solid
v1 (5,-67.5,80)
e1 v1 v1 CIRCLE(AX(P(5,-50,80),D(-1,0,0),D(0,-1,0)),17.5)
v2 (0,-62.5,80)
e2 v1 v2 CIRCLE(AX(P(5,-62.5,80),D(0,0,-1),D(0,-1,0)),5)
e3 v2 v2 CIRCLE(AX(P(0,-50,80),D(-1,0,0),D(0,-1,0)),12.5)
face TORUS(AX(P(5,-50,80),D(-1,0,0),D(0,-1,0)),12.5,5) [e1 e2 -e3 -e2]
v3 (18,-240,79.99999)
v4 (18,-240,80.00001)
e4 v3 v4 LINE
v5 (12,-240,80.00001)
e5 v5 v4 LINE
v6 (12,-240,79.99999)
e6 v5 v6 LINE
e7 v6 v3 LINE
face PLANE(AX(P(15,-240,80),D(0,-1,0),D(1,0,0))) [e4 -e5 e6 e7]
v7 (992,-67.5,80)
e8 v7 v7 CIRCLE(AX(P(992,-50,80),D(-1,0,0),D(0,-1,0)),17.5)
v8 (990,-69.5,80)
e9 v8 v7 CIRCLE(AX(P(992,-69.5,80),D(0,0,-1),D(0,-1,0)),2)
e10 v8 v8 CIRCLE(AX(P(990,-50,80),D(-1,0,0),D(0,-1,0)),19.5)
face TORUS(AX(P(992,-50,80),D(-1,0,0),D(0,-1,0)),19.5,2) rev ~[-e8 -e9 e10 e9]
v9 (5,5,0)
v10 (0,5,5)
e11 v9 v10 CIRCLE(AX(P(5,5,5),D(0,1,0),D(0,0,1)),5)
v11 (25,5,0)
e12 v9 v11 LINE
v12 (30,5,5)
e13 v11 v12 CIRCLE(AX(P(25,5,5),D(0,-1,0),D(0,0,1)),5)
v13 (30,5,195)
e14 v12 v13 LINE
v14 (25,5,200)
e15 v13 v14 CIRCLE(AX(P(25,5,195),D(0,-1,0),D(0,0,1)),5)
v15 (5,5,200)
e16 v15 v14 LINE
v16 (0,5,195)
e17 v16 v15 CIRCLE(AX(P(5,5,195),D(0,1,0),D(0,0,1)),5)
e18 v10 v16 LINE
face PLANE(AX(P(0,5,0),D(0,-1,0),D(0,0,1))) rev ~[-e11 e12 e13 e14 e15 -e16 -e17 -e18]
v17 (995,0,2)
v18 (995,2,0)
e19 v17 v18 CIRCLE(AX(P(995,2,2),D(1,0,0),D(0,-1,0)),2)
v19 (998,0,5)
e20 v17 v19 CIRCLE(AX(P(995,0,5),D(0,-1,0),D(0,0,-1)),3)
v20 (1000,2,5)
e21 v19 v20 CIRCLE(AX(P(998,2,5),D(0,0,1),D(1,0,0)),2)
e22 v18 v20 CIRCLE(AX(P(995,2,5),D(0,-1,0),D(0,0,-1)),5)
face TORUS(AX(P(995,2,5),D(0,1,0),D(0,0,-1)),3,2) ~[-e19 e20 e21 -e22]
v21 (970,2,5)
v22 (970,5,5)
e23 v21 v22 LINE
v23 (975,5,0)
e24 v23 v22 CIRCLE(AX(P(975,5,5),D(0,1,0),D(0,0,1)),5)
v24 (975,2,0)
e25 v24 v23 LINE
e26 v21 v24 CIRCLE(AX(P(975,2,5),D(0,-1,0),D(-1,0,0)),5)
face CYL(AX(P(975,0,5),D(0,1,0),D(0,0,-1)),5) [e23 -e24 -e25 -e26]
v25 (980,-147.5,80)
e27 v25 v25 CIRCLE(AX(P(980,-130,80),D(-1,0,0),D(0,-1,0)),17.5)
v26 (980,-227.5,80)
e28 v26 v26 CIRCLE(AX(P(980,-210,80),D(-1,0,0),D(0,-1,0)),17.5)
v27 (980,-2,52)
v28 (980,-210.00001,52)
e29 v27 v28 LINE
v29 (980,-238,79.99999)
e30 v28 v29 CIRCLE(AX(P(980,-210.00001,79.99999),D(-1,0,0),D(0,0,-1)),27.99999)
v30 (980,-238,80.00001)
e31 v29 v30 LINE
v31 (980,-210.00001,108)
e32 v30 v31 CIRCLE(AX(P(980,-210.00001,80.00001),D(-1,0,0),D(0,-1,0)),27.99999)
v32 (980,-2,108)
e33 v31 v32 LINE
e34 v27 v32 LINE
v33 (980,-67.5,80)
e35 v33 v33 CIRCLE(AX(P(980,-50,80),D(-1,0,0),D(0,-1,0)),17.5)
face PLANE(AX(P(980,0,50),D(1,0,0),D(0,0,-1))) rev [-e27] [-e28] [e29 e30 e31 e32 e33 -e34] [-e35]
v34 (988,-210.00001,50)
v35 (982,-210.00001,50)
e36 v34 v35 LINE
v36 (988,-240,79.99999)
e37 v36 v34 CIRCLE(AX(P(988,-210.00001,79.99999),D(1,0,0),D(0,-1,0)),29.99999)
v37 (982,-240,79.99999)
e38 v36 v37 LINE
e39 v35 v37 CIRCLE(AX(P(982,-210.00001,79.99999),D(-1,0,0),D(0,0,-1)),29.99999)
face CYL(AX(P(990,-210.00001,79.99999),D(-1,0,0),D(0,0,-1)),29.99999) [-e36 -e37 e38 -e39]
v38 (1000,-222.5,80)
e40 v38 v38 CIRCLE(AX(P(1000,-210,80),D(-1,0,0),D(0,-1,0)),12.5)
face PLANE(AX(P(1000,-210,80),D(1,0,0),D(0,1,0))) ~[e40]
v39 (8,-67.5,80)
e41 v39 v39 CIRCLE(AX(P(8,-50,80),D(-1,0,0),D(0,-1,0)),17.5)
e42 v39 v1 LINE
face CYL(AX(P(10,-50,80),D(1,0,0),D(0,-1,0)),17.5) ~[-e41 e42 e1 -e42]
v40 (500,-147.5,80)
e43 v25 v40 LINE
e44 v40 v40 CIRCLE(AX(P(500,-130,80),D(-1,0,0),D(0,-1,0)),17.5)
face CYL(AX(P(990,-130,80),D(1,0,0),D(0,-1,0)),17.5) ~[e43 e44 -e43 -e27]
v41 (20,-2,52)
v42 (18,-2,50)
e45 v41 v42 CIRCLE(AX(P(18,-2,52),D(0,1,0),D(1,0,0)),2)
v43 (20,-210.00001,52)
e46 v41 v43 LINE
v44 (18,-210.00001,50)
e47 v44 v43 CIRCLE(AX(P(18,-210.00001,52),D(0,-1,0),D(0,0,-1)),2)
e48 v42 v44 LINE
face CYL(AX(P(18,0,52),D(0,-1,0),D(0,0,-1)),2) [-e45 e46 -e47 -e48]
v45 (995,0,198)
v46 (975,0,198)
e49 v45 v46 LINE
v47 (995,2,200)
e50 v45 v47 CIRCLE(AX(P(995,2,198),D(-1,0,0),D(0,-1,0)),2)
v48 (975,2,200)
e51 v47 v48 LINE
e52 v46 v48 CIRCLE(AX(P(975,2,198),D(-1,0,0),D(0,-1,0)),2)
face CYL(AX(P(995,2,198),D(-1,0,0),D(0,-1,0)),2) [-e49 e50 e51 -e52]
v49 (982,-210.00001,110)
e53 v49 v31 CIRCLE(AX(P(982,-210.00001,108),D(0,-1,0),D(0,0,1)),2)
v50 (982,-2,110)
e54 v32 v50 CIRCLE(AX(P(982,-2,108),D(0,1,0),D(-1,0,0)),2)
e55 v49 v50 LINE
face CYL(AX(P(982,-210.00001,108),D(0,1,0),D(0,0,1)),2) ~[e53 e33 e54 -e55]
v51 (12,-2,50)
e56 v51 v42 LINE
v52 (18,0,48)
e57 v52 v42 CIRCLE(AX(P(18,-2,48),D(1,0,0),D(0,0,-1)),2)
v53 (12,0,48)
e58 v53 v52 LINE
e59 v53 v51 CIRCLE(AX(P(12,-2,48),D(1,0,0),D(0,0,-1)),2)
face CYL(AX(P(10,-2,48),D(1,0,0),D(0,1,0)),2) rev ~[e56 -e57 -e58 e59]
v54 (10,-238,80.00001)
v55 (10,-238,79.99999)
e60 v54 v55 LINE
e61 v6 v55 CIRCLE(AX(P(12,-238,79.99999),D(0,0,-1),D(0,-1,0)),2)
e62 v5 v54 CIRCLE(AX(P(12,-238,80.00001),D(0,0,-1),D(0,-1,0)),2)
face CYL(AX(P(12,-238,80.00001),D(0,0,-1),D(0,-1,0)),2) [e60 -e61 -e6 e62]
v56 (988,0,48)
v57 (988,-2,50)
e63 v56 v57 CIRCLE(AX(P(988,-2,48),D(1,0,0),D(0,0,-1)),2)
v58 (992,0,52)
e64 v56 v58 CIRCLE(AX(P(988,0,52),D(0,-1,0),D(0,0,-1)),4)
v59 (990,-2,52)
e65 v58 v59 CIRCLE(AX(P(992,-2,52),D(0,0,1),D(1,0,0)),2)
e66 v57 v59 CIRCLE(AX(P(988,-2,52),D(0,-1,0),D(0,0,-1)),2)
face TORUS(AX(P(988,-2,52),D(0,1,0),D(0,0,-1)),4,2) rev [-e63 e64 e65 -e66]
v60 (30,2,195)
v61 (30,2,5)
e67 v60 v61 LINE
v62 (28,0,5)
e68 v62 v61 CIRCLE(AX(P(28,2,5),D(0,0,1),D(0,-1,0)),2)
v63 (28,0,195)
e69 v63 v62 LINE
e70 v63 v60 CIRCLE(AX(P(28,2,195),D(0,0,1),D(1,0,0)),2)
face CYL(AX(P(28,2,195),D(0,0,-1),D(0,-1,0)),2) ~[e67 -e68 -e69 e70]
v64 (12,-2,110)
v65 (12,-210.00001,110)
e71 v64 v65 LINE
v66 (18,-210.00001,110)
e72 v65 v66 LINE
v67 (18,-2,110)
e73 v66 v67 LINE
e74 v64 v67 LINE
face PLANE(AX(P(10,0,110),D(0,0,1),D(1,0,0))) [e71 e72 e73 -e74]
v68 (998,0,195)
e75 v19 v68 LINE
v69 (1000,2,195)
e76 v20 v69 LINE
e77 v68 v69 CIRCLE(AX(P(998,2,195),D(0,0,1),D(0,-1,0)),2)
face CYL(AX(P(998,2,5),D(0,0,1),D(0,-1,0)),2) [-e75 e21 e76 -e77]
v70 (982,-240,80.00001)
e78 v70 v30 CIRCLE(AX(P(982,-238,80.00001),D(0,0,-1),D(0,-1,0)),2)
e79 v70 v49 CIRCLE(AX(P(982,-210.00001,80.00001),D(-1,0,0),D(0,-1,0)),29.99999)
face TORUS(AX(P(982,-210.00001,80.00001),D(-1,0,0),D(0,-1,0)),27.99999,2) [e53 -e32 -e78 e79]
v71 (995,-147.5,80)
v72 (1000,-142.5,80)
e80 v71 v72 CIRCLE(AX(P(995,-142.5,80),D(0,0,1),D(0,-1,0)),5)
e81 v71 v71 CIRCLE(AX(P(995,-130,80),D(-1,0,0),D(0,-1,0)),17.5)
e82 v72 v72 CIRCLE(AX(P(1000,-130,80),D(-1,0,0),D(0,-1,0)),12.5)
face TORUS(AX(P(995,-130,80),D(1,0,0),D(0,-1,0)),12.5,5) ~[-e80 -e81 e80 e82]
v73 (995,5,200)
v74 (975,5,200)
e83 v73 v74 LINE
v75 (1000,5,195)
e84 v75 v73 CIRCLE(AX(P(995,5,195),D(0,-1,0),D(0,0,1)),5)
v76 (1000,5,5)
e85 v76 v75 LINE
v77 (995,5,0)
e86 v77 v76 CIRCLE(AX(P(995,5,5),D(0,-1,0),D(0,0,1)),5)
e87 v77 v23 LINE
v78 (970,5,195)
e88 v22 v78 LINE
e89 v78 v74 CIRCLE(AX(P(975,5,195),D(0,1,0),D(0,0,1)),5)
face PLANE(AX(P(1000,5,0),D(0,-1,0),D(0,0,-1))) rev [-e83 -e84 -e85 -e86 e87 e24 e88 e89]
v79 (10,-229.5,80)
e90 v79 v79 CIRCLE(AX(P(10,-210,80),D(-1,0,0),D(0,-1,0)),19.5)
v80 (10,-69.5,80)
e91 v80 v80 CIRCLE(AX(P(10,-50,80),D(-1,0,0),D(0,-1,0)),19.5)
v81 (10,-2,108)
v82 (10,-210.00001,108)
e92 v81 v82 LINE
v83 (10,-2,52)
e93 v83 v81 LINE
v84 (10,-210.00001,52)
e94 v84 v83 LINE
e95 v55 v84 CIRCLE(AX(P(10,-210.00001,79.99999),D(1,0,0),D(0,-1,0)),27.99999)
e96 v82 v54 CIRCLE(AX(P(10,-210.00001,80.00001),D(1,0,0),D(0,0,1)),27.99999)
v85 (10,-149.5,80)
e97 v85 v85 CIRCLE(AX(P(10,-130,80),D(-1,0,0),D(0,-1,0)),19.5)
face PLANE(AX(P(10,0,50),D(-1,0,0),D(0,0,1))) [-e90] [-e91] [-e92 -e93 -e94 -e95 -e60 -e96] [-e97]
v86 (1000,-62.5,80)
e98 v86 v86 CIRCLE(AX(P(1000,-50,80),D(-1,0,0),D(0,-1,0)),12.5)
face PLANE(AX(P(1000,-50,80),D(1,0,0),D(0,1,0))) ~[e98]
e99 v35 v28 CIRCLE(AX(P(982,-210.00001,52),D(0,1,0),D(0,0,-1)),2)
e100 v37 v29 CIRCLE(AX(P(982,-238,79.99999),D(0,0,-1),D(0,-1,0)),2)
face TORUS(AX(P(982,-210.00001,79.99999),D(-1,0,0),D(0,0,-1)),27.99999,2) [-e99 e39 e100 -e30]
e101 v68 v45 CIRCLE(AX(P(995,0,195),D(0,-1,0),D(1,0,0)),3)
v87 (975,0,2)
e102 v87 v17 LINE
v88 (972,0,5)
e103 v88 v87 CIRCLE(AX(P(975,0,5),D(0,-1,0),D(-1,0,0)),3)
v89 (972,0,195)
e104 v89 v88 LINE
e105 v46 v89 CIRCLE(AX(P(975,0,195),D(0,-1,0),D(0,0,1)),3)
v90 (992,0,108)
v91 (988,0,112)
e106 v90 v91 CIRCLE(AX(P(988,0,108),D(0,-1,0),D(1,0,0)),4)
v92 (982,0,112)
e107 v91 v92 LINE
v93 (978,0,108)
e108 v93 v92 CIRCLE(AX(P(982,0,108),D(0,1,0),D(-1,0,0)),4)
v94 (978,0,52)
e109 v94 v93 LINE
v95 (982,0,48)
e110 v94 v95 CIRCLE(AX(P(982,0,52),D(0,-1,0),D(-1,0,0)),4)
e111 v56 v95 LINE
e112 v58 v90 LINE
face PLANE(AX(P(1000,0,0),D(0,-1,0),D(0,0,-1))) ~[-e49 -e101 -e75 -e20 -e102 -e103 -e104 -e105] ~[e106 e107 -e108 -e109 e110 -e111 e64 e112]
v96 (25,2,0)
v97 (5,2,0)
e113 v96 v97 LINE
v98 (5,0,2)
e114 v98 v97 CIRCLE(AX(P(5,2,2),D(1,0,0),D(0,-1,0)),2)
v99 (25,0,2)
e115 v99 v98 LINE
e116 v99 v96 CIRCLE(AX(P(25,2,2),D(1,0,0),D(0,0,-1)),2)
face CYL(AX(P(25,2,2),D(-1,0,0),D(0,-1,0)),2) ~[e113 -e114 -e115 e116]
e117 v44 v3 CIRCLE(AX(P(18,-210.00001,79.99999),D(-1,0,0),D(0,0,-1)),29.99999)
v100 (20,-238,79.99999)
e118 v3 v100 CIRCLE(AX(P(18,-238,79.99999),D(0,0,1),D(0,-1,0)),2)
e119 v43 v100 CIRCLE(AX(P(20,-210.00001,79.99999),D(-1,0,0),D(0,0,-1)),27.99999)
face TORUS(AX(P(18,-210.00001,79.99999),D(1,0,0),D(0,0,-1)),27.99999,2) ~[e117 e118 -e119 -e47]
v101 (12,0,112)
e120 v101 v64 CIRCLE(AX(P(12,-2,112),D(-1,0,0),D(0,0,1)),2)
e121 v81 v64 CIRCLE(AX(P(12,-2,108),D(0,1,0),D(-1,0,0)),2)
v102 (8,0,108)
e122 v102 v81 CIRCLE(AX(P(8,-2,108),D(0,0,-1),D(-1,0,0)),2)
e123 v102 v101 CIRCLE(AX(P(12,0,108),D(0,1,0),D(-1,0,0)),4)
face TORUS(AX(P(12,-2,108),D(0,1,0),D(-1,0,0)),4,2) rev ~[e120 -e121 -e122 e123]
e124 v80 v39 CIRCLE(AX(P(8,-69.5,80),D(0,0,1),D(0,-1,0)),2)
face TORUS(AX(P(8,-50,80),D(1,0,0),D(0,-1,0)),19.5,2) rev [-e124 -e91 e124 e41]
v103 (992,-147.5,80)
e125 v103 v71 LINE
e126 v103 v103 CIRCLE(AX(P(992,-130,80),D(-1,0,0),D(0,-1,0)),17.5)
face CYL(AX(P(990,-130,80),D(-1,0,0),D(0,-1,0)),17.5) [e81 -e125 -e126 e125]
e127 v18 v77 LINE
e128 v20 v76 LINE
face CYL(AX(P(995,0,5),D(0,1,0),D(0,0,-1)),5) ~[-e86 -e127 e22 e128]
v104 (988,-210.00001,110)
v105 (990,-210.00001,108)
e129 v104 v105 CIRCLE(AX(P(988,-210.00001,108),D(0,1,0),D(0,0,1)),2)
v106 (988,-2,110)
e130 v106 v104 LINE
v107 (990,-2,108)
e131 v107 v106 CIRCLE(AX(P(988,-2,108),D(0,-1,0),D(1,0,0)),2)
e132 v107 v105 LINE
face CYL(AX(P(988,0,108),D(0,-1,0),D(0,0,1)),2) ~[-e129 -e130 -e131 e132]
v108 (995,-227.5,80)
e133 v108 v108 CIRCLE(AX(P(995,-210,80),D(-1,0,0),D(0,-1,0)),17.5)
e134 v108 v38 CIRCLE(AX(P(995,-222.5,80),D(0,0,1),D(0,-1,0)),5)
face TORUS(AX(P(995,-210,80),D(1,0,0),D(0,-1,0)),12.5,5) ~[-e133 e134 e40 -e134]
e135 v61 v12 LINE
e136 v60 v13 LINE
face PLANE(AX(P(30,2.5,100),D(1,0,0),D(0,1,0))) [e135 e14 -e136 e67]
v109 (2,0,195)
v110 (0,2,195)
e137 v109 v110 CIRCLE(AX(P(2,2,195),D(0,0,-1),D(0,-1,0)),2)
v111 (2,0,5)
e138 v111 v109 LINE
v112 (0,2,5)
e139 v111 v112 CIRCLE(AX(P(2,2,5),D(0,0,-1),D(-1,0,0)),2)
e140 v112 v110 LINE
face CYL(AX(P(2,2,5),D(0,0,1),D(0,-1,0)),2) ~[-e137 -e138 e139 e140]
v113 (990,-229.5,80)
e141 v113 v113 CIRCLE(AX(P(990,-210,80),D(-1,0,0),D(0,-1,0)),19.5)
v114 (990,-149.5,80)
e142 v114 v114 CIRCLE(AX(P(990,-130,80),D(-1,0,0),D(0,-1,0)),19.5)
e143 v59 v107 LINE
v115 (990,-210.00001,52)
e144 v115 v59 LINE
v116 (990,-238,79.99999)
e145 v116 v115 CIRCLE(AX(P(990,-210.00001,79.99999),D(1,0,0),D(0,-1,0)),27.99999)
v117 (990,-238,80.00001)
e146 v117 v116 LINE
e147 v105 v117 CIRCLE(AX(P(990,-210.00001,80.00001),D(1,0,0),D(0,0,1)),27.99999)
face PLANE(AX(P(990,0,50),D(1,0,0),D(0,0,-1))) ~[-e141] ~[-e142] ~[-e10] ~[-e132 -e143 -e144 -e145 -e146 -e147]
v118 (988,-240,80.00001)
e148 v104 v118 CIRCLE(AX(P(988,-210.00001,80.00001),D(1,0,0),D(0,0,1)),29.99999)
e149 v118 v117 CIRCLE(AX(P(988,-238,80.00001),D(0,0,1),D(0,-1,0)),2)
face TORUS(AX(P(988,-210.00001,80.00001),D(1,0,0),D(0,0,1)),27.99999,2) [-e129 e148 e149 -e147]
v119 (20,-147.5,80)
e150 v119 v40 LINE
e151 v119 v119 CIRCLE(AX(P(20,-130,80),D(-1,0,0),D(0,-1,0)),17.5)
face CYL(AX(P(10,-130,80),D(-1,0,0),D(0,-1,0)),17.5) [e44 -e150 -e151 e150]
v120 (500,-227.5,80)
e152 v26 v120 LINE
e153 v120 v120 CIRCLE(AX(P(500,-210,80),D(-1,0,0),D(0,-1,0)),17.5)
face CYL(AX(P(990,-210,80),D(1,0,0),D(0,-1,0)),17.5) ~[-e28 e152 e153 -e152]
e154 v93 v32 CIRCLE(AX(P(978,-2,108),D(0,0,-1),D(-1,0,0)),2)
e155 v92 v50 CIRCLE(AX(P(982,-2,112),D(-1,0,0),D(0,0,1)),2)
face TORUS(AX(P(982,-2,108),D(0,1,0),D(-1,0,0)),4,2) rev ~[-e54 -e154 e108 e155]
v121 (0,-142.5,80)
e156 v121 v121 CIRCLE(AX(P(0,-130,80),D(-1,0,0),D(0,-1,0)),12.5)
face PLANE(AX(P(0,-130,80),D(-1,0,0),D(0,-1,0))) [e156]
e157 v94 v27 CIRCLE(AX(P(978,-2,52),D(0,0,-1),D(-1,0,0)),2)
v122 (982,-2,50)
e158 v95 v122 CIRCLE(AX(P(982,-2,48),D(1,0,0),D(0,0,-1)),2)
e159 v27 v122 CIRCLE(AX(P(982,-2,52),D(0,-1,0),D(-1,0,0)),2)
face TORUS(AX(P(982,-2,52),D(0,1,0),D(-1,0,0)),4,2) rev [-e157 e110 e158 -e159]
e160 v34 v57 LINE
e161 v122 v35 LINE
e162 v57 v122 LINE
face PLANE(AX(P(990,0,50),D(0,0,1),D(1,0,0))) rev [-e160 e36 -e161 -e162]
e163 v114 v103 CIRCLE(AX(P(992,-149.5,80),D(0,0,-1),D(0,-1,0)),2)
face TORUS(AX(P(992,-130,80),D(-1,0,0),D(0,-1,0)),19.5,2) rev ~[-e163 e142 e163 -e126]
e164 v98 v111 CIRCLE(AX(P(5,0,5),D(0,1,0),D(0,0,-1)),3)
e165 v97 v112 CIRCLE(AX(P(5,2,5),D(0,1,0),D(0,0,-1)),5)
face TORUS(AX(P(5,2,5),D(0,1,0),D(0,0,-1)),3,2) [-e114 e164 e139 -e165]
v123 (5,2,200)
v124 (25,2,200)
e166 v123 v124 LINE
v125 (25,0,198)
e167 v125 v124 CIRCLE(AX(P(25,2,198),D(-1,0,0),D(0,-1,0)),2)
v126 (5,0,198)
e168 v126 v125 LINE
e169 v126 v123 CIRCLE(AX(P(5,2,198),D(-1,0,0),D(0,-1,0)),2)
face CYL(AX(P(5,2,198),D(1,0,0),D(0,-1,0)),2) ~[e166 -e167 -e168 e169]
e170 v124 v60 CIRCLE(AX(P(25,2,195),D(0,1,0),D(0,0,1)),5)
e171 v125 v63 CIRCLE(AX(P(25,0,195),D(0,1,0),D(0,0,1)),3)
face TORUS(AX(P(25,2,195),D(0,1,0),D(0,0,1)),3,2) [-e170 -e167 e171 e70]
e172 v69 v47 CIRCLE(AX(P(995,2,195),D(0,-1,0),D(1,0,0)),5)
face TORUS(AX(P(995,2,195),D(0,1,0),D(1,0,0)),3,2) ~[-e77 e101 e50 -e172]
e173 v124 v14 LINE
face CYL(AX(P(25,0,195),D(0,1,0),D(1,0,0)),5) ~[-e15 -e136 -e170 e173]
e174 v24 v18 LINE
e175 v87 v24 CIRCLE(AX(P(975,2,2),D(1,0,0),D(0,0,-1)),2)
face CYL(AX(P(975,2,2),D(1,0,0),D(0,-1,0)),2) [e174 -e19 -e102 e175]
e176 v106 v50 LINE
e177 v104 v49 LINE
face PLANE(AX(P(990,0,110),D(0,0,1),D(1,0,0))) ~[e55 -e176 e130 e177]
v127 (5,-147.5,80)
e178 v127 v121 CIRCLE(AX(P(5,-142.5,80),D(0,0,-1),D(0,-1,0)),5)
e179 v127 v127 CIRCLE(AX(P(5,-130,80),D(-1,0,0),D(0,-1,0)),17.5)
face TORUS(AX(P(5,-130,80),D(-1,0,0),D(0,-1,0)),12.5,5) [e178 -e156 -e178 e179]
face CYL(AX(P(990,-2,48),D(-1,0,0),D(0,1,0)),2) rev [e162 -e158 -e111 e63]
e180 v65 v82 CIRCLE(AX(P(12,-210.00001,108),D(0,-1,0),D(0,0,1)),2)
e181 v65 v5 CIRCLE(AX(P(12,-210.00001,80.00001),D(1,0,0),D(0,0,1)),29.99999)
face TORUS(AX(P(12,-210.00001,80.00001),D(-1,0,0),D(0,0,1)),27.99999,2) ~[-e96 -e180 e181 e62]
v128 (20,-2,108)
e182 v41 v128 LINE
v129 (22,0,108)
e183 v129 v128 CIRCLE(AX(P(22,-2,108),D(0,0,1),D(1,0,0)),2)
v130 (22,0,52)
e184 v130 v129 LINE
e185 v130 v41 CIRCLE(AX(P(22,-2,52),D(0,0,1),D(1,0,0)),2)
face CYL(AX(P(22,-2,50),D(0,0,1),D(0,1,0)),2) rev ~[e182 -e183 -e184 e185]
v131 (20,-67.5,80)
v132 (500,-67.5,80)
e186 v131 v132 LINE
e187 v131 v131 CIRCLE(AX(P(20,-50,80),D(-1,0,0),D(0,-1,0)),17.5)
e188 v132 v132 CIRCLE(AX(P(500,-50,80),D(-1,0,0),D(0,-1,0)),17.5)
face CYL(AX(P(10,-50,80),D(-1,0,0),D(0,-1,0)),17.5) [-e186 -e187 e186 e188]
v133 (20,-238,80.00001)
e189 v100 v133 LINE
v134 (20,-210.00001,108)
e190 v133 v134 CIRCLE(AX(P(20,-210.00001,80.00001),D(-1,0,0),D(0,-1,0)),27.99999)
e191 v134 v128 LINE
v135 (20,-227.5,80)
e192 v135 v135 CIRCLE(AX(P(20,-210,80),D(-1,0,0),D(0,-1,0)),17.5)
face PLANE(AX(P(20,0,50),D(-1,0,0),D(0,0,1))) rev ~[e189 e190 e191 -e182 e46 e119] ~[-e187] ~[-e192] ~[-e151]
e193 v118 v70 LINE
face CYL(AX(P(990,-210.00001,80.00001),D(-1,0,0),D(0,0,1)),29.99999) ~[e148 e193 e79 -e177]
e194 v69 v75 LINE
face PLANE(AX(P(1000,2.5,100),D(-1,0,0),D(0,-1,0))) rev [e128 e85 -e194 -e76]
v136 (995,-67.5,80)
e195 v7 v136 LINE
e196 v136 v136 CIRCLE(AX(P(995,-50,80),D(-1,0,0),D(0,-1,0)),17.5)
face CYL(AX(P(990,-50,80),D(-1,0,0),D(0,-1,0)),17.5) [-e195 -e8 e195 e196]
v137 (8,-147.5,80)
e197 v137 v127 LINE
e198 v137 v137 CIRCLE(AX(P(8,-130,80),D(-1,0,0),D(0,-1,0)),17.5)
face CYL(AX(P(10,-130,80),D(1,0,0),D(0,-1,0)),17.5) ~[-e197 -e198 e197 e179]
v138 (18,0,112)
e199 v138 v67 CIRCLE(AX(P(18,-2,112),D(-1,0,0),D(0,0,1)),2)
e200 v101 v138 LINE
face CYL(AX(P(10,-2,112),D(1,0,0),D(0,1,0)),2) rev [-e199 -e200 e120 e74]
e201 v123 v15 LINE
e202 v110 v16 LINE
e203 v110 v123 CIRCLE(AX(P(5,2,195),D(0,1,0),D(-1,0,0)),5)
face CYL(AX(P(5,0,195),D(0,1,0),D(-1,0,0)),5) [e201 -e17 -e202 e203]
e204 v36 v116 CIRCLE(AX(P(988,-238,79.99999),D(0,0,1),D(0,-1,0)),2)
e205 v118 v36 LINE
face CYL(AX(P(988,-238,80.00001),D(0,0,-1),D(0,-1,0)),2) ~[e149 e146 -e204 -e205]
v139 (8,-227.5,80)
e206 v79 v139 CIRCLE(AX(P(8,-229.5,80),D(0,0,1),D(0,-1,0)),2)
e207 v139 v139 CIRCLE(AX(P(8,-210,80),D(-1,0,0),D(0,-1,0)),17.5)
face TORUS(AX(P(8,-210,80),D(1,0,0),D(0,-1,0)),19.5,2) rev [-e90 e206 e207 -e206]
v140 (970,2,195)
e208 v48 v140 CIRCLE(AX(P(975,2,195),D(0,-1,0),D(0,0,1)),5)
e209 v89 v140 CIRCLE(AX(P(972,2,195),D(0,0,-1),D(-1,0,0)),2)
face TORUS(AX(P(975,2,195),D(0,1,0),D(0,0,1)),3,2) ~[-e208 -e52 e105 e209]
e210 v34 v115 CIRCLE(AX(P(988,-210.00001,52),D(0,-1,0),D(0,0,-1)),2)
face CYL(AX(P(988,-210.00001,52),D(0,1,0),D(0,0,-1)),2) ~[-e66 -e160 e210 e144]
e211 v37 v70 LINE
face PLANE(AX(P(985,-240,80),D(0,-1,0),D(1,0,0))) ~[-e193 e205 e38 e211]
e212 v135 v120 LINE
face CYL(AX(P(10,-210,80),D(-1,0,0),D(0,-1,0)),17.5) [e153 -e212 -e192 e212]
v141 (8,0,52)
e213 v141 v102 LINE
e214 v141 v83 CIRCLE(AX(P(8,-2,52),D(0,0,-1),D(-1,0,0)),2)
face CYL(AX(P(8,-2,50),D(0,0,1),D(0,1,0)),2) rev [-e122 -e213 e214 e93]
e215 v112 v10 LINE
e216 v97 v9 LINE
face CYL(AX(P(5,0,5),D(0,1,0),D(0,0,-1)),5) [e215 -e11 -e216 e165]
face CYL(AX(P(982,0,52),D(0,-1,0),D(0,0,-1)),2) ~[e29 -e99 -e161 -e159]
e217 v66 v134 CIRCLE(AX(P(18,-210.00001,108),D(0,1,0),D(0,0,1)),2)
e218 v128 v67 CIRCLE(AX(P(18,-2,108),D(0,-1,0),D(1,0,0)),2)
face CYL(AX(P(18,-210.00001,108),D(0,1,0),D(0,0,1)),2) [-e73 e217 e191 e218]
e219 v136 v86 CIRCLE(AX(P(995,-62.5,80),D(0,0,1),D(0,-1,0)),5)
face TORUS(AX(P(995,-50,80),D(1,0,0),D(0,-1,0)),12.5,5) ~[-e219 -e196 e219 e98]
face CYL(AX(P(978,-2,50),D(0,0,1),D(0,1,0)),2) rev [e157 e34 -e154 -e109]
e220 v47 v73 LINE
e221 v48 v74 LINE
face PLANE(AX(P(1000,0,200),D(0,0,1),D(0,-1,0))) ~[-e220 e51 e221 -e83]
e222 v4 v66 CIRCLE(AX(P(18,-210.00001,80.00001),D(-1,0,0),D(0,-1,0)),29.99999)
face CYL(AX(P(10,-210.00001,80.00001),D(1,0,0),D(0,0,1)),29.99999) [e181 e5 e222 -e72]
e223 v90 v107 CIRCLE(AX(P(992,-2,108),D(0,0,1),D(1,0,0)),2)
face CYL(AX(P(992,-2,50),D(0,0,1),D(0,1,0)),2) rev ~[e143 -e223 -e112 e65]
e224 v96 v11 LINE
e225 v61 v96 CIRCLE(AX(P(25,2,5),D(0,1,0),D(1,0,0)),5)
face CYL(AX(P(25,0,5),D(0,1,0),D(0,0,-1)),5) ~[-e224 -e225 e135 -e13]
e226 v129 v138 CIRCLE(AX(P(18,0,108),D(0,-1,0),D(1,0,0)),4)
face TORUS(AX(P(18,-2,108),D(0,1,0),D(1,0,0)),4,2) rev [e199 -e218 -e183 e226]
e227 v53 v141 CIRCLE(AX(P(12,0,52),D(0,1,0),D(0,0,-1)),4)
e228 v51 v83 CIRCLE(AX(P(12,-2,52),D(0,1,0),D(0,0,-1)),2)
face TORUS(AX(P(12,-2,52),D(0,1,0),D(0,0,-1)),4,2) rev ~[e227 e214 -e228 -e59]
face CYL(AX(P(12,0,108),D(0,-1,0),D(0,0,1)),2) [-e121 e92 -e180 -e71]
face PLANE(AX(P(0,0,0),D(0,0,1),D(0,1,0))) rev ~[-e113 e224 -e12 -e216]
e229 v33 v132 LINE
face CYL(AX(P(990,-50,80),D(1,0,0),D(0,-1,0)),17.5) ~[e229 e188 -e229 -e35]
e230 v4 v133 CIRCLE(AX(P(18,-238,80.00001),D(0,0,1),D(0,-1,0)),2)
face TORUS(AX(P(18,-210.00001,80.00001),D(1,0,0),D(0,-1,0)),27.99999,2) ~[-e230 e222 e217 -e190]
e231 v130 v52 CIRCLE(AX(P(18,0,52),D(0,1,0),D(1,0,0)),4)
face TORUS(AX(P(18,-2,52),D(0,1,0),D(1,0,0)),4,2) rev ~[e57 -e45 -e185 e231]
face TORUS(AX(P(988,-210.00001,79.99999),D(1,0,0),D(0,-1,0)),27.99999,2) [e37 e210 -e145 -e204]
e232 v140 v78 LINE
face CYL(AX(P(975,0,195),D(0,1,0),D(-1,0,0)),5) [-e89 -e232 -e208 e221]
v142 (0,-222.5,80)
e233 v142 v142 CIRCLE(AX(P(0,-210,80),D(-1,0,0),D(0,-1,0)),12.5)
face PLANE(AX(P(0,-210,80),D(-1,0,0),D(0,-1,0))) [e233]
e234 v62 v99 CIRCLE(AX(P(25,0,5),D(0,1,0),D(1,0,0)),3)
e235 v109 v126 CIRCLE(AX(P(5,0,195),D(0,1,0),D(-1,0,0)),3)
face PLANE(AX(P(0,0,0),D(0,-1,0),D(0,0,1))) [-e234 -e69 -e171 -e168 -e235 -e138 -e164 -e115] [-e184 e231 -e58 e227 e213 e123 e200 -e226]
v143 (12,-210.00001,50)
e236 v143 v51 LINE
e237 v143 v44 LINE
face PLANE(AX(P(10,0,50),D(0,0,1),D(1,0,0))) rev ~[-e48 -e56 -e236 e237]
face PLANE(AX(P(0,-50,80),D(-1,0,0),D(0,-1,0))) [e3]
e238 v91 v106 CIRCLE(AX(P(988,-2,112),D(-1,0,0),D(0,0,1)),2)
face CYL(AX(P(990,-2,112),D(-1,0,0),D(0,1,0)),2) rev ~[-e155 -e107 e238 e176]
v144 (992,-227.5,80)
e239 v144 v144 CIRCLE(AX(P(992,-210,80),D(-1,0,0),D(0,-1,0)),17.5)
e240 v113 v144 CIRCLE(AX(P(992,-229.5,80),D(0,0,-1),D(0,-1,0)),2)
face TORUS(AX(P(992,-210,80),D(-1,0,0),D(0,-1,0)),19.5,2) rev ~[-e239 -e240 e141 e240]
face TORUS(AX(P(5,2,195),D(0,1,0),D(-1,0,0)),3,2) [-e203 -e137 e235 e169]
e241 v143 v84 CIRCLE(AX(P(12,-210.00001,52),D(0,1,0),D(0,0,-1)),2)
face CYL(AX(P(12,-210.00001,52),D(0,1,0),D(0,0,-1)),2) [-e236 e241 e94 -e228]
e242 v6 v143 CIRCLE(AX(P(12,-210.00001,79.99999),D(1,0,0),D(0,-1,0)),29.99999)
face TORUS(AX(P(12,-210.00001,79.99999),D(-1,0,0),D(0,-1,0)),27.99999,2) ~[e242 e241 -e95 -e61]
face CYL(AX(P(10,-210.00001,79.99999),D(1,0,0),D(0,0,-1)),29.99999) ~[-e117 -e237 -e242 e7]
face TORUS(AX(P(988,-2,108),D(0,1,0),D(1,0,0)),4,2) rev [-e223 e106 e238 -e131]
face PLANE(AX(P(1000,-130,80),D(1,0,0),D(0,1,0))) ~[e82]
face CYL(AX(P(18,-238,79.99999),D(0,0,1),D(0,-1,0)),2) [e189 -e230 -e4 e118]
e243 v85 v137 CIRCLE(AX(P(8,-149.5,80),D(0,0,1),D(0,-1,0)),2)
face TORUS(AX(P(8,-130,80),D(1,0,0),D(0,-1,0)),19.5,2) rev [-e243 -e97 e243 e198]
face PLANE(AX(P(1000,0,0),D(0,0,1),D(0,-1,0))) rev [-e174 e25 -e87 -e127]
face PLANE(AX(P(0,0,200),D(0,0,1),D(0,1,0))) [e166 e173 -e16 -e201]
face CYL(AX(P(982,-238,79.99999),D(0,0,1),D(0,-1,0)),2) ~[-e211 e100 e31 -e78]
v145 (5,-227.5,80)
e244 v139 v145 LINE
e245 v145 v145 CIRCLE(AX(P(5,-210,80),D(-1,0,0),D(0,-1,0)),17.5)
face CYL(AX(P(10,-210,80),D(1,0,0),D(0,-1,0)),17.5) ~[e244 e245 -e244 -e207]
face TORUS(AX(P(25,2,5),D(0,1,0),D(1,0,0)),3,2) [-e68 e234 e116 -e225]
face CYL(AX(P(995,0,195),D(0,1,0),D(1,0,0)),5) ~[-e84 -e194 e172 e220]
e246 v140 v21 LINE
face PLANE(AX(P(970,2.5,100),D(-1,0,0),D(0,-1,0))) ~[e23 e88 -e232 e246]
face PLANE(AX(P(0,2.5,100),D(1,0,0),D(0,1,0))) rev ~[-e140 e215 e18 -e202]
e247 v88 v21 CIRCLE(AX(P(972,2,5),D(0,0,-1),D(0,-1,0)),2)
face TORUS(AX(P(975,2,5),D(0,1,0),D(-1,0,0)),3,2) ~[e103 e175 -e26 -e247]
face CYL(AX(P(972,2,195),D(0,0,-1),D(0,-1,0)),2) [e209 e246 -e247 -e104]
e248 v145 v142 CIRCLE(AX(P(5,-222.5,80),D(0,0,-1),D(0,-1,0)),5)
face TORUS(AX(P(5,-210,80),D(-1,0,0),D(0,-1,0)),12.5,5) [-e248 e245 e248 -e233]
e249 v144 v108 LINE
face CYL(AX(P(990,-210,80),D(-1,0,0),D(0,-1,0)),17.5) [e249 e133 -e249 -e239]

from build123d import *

# Parameters (mm, degrees)
F0_W     = 5
F0_H     = 200
F1_DEPTH = 30
F2_W     = 10
F2_H     = 60
F3_DEPTH = 240
F4_R     = 29.99999
F5_R     = 17.5
F6_DEPTH = 10
F7_R     = 17.5
F8_DEPTH = 490
F9_R     = 5
F10_R    = 2


# Not quite as in the source:
# - a fillet or chamfer is up to 0.001 mm smaller than in the source, because OpenCascade refuses the exact size


with BuildPart() as f1:
    # F0 (on Right) → F1 (new body)
    with BuildSketch(Plane.YZ):
        with Locations((2.5, 100)):
            Rectangle(F0_W, F0_H)
    extrude(amount=F1_DEPTH)

    # F2 (on face) → F3 (join)
    with BuildSketch(Plane.XZ):
        with Locations((15, 80)):
            Rectangle(F2_W, F2_H)
    extrude(amount=F3_DEPTH)

    # F4 (radius 30 in the source; OpenCascade refuses exactly that, so slightly less here)
    f4_edges = [f1.edges().sort_by_distance(p)[0] for p in [
        (15, -240, 110),
        (15, -240, 50),
    ]]
    fillet(f4_edges, radius=F4_R)

    # F5 (on face) → F6 (join)
    with BuildSketch(Plane(origin=(10, 0, 0), x_dir=(0, -1, 0), z_dir=(-1, 0, 0))):
        with Locations((210, 80)):
            Circle(F5_R)
        with Locations((130, 80)):
            Circle(F5_R)
        with Locations((50, 80)):
            Circle(F5_R)
    extrude(amount=F6_DEPTH)

    # F7 (on face) → F8 (join)
    with BuildSketch(Plane(origin=(10, 0, 0), x_dir=(0, -1, 0), z_dir=(-1, 0, 0))):
        with Locations((50, 80)):
            Circle(F7_R)
        with Locations((130, 80)):
            Circle(F7_R)
        with Locations((210, 80)):
            Circle(F7_R)
    extrude(amount=-F8_DEPTH)

    # F9
    f9_edges = [f1.edges().sort_by_distance(p)[0] for p in [
        (0, -192.5, 80),
        (0, -112.5, 80),
        (0, -32.5, 80),
        (0, 2.5, 0),
        (30, 2.5, 0),
        (30, 2.5, 200),
        (0, 2.5, 200),
    ]]
    fillet(f9_edges, radius=F9_R)

    # F10
    f10_edges = [f1.edges().sort_by_distance(p)[0] for p in [
        (15, 0, 200),
        (1.464466, 0, 198.535534),
        (28.535534, 0, 198.535534),
        (0, 0, 100),
        (30, 0, 100),
        (1.464466, 0, 1.464466),
        (28.535534, 0, 1.464466),
        (15, 0, 0),
        (20, 0, 80),
        (15, 0, 50),
        (10, 0, 80),
        (15, 0, 110),
        (10, -105.000005, 110),
        (10, -231.213206, 101.213206),
        (10, -240, 80),
        (10, -105.000005, 50),
        (10, -231.213206, 58.786794),
        (10, -192.5, 80),
        (10, -112.5, 80),
        (10, -32.5, 80),
        (15, -210.00001, 50),
        (20, -105.000005, 50),
    ]]
    fillet(f10_edges, radius=F10_R)

    # F12: F1 across plane


with BuildPart() as f1_1:
    add(f1.part)
    add(f1.part.mirror(Plane.YZ.offset(500)))


solid = f1_1.part
